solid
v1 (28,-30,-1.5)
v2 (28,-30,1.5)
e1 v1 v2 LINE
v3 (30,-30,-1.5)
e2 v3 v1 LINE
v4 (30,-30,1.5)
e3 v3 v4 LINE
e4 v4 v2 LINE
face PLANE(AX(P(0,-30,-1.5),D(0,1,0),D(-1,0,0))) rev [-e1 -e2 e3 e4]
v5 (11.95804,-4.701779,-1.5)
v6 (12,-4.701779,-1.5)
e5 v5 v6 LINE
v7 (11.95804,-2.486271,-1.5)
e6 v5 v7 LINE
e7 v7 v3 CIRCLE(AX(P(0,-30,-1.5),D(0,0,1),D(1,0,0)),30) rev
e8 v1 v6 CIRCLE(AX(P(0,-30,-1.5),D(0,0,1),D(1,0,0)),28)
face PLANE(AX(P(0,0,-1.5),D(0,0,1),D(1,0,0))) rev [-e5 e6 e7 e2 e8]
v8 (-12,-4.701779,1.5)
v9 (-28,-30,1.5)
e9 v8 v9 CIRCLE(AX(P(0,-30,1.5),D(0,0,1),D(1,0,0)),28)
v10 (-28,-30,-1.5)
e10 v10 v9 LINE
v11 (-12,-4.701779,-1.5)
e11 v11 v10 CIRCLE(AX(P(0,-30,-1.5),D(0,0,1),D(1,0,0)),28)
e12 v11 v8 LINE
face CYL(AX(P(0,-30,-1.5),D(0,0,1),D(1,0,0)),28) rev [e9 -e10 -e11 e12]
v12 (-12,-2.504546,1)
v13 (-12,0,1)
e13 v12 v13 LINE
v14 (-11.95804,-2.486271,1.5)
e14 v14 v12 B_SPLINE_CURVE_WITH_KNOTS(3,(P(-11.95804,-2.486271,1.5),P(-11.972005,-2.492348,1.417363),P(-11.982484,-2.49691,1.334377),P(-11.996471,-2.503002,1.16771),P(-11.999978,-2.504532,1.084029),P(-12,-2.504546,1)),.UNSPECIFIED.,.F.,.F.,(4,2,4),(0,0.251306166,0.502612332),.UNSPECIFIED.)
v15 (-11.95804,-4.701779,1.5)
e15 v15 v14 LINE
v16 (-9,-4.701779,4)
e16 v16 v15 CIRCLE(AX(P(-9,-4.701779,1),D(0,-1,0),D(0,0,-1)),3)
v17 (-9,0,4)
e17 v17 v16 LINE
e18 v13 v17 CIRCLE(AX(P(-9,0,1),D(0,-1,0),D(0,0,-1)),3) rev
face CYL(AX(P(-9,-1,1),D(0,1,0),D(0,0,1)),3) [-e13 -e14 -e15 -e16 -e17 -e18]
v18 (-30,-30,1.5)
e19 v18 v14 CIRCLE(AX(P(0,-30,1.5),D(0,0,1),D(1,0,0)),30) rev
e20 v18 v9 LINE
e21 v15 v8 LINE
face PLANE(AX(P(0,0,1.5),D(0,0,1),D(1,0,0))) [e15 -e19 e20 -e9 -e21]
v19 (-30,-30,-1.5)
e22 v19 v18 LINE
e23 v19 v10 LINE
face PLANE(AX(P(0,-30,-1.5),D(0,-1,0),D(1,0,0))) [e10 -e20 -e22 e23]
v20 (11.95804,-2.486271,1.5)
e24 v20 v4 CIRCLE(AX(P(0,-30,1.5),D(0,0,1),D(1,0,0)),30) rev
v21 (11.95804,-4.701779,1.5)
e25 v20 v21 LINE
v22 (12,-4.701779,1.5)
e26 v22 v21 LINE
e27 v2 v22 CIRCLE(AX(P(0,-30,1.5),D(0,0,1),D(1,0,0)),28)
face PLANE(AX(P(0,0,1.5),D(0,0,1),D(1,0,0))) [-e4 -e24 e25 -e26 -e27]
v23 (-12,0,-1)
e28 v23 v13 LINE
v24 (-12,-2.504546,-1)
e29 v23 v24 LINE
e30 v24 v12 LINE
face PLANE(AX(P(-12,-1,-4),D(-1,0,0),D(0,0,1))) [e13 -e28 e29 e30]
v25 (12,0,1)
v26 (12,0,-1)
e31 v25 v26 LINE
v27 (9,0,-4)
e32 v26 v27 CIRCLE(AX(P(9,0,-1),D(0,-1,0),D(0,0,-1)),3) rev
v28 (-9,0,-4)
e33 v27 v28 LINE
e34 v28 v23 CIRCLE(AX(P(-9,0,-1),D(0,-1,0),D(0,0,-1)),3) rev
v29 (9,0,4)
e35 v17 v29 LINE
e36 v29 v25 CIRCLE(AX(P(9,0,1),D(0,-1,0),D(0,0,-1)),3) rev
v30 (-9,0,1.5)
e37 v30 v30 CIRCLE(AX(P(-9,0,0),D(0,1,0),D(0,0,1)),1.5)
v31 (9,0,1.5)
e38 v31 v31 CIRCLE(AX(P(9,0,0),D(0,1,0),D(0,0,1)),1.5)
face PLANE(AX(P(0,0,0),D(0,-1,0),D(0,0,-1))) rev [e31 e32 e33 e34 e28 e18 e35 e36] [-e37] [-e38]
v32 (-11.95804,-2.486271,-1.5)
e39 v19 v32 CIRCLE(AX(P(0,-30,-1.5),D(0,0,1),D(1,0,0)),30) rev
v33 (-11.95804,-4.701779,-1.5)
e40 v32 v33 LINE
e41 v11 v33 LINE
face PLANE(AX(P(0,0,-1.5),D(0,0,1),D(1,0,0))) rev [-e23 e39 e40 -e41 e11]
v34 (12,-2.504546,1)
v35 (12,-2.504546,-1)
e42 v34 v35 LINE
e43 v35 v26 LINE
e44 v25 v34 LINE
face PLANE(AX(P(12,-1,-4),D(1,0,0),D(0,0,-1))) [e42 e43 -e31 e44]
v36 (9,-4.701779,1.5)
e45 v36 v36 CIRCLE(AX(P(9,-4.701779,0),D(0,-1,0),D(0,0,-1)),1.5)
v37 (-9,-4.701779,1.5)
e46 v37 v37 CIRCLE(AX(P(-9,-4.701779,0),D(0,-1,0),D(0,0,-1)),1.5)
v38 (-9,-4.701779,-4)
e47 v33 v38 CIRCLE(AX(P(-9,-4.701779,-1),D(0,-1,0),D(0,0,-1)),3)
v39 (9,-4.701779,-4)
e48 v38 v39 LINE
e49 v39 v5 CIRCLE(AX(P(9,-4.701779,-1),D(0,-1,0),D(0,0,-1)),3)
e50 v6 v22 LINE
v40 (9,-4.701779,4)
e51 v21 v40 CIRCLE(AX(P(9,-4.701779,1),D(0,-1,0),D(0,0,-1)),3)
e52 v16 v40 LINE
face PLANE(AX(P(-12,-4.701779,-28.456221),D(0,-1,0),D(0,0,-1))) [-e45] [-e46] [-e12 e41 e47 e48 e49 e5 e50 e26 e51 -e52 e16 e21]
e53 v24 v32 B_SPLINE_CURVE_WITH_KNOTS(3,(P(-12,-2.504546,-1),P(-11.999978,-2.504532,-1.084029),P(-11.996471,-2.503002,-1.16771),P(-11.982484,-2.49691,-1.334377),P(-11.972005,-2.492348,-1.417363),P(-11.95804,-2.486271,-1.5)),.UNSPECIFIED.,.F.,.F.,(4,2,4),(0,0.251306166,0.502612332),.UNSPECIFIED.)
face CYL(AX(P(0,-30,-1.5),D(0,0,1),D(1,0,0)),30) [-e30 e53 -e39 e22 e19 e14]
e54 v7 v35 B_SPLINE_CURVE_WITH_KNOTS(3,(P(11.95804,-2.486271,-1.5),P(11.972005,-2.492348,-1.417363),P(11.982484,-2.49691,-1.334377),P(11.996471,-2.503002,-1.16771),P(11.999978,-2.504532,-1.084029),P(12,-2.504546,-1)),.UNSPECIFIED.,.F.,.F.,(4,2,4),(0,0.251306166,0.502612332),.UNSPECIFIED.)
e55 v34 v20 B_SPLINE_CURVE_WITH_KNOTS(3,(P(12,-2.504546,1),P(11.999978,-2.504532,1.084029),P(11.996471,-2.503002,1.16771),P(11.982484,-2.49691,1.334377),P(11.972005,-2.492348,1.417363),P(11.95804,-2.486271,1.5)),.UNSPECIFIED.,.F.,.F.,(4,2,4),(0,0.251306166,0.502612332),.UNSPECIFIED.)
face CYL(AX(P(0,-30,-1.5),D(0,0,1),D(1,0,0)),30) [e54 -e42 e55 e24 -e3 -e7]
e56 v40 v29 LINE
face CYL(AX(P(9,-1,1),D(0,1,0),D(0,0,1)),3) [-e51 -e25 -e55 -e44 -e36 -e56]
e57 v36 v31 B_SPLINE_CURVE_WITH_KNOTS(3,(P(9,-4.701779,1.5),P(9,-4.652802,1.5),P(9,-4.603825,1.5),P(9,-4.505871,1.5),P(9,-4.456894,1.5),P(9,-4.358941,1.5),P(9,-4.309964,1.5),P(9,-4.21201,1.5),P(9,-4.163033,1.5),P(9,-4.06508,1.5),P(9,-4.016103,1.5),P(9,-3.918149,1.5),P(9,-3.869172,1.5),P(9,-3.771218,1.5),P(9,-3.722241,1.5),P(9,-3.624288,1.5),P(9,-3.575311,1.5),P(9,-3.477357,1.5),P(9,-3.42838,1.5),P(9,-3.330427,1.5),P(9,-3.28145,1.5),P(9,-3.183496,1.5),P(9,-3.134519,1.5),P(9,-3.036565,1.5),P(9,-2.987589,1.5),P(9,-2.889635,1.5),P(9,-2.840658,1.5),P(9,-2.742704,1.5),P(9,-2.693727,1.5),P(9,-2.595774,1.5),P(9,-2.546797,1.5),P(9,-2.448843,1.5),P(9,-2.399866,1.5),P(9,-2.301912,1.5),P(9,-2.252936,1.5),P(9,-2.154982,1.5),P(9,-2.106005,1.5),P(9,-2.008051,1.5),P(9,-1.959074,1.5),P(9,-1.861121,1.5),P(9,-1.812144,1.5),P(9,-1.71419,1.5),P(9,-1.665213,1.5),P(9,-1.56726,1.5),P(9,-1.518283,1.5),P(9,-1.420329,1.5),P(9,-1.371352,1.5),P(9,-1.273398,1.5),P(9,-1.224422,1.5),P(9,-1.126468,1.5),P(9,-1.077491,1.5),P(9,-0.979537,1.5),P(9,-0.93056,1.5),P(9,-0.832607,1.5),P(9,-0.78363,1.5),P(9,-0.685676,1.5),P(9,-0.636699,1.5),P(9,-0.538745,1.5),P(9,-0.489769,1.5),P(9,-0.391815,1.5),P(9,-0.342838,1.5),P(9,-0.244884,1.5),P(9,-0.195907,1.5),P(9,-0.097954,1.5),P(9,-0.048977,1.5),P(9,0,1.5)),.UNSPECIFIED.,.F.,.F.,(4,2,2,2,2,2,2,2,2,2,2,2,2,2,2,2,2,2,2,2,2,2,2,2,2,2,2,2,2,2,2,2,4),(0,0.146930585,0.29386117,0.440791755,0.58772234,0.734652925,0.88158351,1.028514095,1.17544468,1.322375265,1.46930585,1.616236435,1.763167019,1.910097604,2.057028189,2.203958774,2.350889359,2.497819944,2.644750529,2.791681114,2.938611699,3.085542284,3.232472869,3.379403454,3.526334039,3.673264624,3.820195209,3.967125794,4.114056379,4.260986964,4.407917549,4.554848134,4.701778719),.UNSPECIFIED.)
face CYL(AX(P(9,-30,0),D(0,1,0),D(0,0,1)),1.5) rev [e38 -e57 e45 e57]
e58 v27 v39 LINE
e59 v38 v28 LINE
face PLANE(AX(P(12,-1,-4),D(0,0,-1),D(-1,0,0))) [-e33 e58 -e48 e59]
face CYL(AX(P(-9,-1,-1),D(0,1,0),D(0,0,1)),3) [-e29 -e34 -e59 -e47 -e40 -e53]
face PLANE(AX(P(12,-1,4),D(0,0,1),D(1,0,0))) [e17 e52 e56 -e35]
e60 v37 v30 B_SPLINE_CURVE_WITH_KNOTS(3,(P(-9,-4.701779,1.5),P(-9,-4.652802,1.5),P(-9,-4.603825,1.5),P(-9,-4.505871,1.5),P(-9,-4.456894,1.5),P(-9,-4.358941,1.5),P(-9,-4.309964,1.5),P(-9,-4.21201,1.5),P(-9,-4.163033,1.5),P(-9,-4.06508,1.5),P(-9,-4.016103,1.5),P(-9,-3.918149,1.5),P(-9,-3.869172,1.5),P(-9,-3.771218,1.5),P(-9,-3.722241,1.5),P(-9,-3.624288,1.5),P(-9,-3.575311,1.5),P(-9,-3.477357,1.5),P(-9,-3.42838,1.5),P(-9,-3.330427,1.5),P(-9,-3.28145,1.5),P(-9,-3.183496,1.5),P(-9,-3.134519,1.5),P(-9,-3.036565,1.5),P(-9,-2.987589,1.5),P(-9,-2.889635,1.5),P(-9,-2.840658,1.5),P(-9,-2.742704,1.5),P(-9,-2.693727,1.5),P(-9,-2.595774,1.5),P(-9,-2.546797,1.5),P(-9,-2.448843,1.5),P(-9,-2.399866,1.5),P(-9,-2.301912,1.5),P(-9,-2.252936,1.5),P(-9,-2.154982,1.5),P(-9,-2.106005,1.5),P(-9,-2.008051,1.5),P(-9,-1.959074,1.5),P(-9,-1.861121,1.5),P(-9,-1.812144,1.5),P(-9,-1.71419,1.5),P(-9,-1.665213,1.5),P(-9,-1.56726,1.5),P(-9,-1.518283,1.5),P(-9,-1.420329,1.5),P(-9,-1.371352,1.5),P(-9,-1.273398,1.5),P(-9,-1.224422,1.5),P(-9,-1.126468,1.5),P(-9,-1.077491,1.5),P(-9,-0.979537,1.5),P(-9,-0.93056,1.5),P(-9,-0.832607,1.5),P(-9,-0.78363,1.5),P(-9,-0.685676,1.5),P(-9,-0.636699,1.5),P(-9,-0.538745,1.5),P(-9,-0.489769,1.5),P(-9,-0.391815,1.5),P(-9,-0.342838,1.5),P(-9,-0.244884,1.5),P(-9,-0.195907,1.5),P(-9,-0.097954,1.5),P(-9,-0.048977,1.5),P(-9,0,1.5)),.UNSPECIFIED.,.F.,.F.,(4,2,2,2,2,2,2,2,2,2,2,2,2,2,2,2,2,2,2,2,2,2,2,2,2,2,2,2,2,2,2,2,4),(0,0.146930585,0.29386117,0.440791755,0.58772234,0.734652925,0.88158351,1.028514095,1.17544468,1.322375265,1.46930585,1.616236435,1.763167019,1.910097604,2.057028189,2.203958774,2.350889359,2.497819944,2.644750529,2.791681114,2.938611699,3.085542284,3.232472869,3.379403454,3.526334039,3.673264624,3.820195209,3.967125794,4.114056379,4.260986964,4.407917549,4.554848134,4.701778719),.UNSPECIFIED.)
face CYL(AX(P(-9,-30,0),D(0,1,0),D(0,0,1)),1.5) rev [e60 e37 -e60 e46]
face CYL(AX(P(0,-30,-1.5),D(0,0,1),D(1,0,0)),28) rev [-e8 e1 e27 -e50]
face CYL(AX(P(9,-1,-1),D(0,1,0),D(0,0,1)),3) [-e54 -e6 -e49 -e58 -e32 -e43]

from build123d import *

# Parameters (mm, degrees)
SKETCH_2_W           = 24
SKETCH_2_H           = 8
EXTRUDE_1_DEPTH      = 1
EXTRUDE_3_DEPTH      = 1.5
EXTRUDE_3_DEPTH_BACK = 1.5
EXTRUDE_5_REACH      = 45.174
SKETCH_7_W           = 24
SKETCH_7_H           = 4.701778719
SKETCH_3_R           = 1.5
CUT_EXTRUDE_1_DEPTH  = 43.614551505
FILLET_1_R           = 3


with BuildPart() as part:
    # 草图2 → 凸台-拉伸1 (new body)
    with BuildSketch(Plane(origin=(0, 0, 0), x_dir=(1, 0, 0), z_dir=(0, 1, 0))):
        Rectangle(SKETCH_2_W, SKETCH_2_H)
    extrude(amount=-EXTRUDE_1_DEPTH)

    # 凸台-拉伸5: up to this face of the body (flat: up to its plane)
    extrude_5_end = Plane(part.part.faces().sort_by_distance((0, -0.5, -4))[0])
    # 草图7 → 凸台-拉伸5 (add, up to the picked face)
    with BuildSketch(Plane.XY.offset(4), mode=Mode.PRIVATE) as extrude_5_sk1:
        with Locations((0, -2.350889359)):
            Rectangle(SKETCH_7_W, SKETCH_7_H)
    extrude_5_tool1 = split(extrude(extrude_5_sk1.sketch, amount=-EXTRUDE_5_REACH, mode=Mode.PRIVATE), bisect_by=extrude_5_end, keep=Keep.BOTH, mode=Mode.PRIVATE)


with BuildPart() as body_2:
    # 草图5 → 凸台-拉伸3 (new, two sides: drawn at the far end of the back side and taken through both)
    with BuildSketch(Plane.XY.offset(-EXTRUDE_3_DEPTH_BACK)):
        with BuildLine():
            ThreePointArc((30, -30), (21.213203436, -8.786796564), (0, 0))
            Line((0, 0), (0, -2))
            ThreePointArc((0, -2), (19.798989873, -10.201010127), (28, -30))
            Line((28, -30), (30, -30))
        make_face()
        with BuildLine():
            Line((0, -2), (0, 0))
            ThreePointArc((0, 0), (-21.213203436, -8.786796564), (-30, -30))
            Line((-30, -30), (-28, -30))
            ThreePointArc((-28, -30), (-19.798989873, -10.201010127), (0, -2))
        make_face()
    extrude(amount=EXTRUDE_3_DEPTH + EXTRUDE_3_DEPTH_BACK)


with BuildPart() as part_1:
    add(part.part)

    add(body_2.part)  # 凸台-拉伸5 merges body 2
    add(extrude_5_tool1.solids().sort_by(Axis((0, -2.350889, 4), (0, 0, -1)))[0])

    # 草图3 → 切除-拉伸1 (cut, through all)
    with BuildSketch(Plane(origin=(0, 0, 0), x_dir=(1, 0, 0), z_dir=(0, 1, 0))):
        with Locations(Location((-9, 0, 0), (0, 0, 270))):
            Circle(SKETCH_3_R)
        with Locations(Location((9, 0, 0), (0, 0, 270))):
            Circle(SKETCH_3_R)
    extrude(amount=-CUT_EXTRUDE_1_DEPTH, mode=Mode.SUBTRACT)

    # 圆角1
    # the kernel refuses this fillet: 3 mm, written as the material it takes off along each edge
    with BuildSketch(Plane(origin=(-12, -12.201778719, 4), x_dir=(0, 0, -1), z_dir=(0, 1, 0))) as fillet_1_piece_1_section:
        with BuildLine():
            CenterArc((FILLET_1_R, -FILLET_1_R), FILLET_1_R, 90, 90)
            Line((0, -FILLET_1_R), (0, 0))
            Line((0, 0), (FILLET_1_R, 0))
        make_face()
    fillet_1_piece_1 = extrude(amount=19.701778719, mode=Mode.PRIVATE)
    fillet_1_piece_1 = split(fillet_1_piece_1, bisect_by=Plane(origin=(-10.876445005, -4.454369233, 1.5), z_dir=(0, 0, 1)), keep=Keep.TOP, mode=Mode.PRIVATE)
    add(fillet_1_piece_1, mode=Mode.SUBTRACT)
    with BuildSketch(Plane(origin=(-12, -12.201778719, 4), x_dir=(0, 0, -1), z_dir=(0, 1, 0))) as fillet_1_piece_2_section:
        with BuildLine():
            CenterArc((FILLET_1_R, -FILLET_1_R), FILLET_1_R, 90, 90)
            Line((0, -FILLET_1_R), (0, 0))
            Line((0, 0), (FILLET_1_R, 0))
        make_face()
    fillet_1_piece_2 = extrude(amount=19.701778719, mode=Mode.PRIVATE)
    fillet_1_piece_2 = fillet_1_piece_2 - Plane(origin=(0, -30, 1.375084053), x_dir=(1, 0, 0), z_dir=(0, 0, -1)) * Cylinder(30, 52, mode=Mode.PRIVATE)
    add(fillet_1_piece_2, mode=Mode.SUBTRACT)
    with BuildSketch(Plane(origin=(-12, -12.201778719, -4), x_dir=(1, 0, 0), z_dir=(0, 1, 0))) as fillet_1_piece_3_section:
        with BuildLine():
            CenterArc((FILLET_1_R, -FILLET_1_R), FILLET_1_R, 90, 90)
            Line((0, -FILLET_1_R), (0, 0))
            Line((0, 0), (FILLET_1_R, 0))
        make_face()
    fillet_1_piece_3 = extrude(amount=19.701778719, mode=Mode.PRIVATE)
    fillet_1_piece_3 = split(fillet_1_piece_3, bisect_by=Plane(origin=(-10.876427582, -4.45436464, -1.5), z_dir=(0, 0, -1)), keep=Keep.TOP, mode=Mode.PRIVATE)
    add(fillet_1_piece_3, mode=Mode.SUBTRACT)
    with BuildSketch(Plane(origin=(-12, -12.201778719, -4), x_dir=(1, 0, 0), z_dir=(0, 1, 0))) as fillet_1_piece_4_section:
        with BuildLine():
            CenterArc((FILLET_1_R, -FILLET_1_R), FILLET_1_R, 90, 90)
            Line((0, -FILLET_1_R), (0, 0))
            Line((0, 0), (FILLET_1_R, 0))
        make_face()
    fillet_1_piece_4 = extrude(amount=19.701778719, mode=Mode.PRIVATE)
    fillet_1_piece_4 = fillet_1_piece_4 - Plane(origin=(0, -30, -1.375084091), x_dir=(1, 0, 0), z_dir=(0, 0, -1)) * Cylinder(30, 52, mode=Mode.PRIVATE)
    add(fillet_1_piece_4, mode=Mode.SUBTRACT)
    with BuildSketch(Plane(origin=(12, 7.5, 4), x_dir=(0, 0, -1), z_dir=(0, -1, 0))) as fillet_1_piece_5_section:
        with BuildLine():
            CenterArc((FILLET_1_R, -FILLET_1_R), FILLET_1_R, 90, 90)
            Line((0, -FILLET_1_R), (0, 0))
            Line((0, 0), (FILLET_1_R, 0))
        make_face()
    fillet_1_piece_5 = extrude(amount=19.701778719, mode=Mode.PRIVATE)
    fillet_1_piece_5 = fillet_1_piece_5 - Plane(origin=(0, -30, 1.375084091), x_dir=(1, 0, 0), z_dir=(0, 0, -1)) * Cylinder(30, 52, mode=Mode.PRIVATE)
    add(fillet_1_piece_5, mode=Mode.SUBTRACT)
    with BuildSketch(Plane(origin=(12, 7.5, 4), x_dir=(0, 0, -1), z_dir=(0, -1, 0))) as fillet_1_piece_6_section:
        with BuildLine():
            CenterArc((FILLET_1_R, -FILLET_1_R), FILLET_1_R, 90, 90)
            Line((0, -FILLET_1_R), (0, 0))
            Line((0, 0), (FILLET_1_R, 0))
        make_face()
    fillet_1_piece_6 = extrude(amount=19.701778719, mode=Mode.PRIVATE)
    fillet_1_piece_6 = split(fillet_1_piece_6, bisect_by=Plane(origin=(11.332354587, -3.316124118, 1.5), z_dir=(0, 0, 1)), keep=Keep.TOP, mode=Mode.PRIVATE)
    add(fillet_1_piece_6, mode=Mode.SUBTRACT)
    with BuildSketch(Plane(origin=(12, 7.5, -4), x_dir=(-1, 0, 0), z_dir=(0, -1, 0))) as fillet_1_piece_7_section:
        with BuildLine():
            CenterArc((FILLET_1_R, -FILLET_1_R), FILLET_1_R, 90, 90)
            Line((0, -FILLET_1_R), (0, 0))
            Line((0, 0), (FILLET_1_R, 0))
        make_face()
    fillet_1_piece_7 = extrude(amount=19.701778719, mode=Mode.PRIVATE)
    fillet_1_piece_7 = split(fillet_1_piece_7, bisect_by=Plane(origin=(11.383708583, -1.124807359, -1.5), z_dir=(0, 0, -1)), keep=Keep.TOP, mode=Mode.PRIVATE)
    add(fillet_1_piece_7, mode=Mode.SUBTRACT)
    with BuildSketch(Plane(origin=(12, 7.5, -4), x_dir=(-1, 0, 0), z_dir=(0, -1, 0))) as fillet_1_piece_8_section:
        with BuildLine():
            CenterArc((FILLET_1_R, -FILLET_1_R), FILLET_1_R, 90, 90)
            Line((0, -FILLET_1_R), (0, 0))
            Line((0, 0), (FILLET_1_R, 0))
        make_face()
    fillet_1_piece_8 = extrude(amount=19.701778719, mode=Mode.PRIVATE)
    fillet_1_piece_8 = fillet_1_piece_8 - Plane(origin=(0, -30, -1.375084091), x_dir=(1, 0, 0), z_dir=(0, 0, -1)) * Cylinder(30, 52, mode=Mode.PRIVATE)
    add(fillet_1_piece_8, mode=Mode.SUBTRACT)


solid = part_1.part
